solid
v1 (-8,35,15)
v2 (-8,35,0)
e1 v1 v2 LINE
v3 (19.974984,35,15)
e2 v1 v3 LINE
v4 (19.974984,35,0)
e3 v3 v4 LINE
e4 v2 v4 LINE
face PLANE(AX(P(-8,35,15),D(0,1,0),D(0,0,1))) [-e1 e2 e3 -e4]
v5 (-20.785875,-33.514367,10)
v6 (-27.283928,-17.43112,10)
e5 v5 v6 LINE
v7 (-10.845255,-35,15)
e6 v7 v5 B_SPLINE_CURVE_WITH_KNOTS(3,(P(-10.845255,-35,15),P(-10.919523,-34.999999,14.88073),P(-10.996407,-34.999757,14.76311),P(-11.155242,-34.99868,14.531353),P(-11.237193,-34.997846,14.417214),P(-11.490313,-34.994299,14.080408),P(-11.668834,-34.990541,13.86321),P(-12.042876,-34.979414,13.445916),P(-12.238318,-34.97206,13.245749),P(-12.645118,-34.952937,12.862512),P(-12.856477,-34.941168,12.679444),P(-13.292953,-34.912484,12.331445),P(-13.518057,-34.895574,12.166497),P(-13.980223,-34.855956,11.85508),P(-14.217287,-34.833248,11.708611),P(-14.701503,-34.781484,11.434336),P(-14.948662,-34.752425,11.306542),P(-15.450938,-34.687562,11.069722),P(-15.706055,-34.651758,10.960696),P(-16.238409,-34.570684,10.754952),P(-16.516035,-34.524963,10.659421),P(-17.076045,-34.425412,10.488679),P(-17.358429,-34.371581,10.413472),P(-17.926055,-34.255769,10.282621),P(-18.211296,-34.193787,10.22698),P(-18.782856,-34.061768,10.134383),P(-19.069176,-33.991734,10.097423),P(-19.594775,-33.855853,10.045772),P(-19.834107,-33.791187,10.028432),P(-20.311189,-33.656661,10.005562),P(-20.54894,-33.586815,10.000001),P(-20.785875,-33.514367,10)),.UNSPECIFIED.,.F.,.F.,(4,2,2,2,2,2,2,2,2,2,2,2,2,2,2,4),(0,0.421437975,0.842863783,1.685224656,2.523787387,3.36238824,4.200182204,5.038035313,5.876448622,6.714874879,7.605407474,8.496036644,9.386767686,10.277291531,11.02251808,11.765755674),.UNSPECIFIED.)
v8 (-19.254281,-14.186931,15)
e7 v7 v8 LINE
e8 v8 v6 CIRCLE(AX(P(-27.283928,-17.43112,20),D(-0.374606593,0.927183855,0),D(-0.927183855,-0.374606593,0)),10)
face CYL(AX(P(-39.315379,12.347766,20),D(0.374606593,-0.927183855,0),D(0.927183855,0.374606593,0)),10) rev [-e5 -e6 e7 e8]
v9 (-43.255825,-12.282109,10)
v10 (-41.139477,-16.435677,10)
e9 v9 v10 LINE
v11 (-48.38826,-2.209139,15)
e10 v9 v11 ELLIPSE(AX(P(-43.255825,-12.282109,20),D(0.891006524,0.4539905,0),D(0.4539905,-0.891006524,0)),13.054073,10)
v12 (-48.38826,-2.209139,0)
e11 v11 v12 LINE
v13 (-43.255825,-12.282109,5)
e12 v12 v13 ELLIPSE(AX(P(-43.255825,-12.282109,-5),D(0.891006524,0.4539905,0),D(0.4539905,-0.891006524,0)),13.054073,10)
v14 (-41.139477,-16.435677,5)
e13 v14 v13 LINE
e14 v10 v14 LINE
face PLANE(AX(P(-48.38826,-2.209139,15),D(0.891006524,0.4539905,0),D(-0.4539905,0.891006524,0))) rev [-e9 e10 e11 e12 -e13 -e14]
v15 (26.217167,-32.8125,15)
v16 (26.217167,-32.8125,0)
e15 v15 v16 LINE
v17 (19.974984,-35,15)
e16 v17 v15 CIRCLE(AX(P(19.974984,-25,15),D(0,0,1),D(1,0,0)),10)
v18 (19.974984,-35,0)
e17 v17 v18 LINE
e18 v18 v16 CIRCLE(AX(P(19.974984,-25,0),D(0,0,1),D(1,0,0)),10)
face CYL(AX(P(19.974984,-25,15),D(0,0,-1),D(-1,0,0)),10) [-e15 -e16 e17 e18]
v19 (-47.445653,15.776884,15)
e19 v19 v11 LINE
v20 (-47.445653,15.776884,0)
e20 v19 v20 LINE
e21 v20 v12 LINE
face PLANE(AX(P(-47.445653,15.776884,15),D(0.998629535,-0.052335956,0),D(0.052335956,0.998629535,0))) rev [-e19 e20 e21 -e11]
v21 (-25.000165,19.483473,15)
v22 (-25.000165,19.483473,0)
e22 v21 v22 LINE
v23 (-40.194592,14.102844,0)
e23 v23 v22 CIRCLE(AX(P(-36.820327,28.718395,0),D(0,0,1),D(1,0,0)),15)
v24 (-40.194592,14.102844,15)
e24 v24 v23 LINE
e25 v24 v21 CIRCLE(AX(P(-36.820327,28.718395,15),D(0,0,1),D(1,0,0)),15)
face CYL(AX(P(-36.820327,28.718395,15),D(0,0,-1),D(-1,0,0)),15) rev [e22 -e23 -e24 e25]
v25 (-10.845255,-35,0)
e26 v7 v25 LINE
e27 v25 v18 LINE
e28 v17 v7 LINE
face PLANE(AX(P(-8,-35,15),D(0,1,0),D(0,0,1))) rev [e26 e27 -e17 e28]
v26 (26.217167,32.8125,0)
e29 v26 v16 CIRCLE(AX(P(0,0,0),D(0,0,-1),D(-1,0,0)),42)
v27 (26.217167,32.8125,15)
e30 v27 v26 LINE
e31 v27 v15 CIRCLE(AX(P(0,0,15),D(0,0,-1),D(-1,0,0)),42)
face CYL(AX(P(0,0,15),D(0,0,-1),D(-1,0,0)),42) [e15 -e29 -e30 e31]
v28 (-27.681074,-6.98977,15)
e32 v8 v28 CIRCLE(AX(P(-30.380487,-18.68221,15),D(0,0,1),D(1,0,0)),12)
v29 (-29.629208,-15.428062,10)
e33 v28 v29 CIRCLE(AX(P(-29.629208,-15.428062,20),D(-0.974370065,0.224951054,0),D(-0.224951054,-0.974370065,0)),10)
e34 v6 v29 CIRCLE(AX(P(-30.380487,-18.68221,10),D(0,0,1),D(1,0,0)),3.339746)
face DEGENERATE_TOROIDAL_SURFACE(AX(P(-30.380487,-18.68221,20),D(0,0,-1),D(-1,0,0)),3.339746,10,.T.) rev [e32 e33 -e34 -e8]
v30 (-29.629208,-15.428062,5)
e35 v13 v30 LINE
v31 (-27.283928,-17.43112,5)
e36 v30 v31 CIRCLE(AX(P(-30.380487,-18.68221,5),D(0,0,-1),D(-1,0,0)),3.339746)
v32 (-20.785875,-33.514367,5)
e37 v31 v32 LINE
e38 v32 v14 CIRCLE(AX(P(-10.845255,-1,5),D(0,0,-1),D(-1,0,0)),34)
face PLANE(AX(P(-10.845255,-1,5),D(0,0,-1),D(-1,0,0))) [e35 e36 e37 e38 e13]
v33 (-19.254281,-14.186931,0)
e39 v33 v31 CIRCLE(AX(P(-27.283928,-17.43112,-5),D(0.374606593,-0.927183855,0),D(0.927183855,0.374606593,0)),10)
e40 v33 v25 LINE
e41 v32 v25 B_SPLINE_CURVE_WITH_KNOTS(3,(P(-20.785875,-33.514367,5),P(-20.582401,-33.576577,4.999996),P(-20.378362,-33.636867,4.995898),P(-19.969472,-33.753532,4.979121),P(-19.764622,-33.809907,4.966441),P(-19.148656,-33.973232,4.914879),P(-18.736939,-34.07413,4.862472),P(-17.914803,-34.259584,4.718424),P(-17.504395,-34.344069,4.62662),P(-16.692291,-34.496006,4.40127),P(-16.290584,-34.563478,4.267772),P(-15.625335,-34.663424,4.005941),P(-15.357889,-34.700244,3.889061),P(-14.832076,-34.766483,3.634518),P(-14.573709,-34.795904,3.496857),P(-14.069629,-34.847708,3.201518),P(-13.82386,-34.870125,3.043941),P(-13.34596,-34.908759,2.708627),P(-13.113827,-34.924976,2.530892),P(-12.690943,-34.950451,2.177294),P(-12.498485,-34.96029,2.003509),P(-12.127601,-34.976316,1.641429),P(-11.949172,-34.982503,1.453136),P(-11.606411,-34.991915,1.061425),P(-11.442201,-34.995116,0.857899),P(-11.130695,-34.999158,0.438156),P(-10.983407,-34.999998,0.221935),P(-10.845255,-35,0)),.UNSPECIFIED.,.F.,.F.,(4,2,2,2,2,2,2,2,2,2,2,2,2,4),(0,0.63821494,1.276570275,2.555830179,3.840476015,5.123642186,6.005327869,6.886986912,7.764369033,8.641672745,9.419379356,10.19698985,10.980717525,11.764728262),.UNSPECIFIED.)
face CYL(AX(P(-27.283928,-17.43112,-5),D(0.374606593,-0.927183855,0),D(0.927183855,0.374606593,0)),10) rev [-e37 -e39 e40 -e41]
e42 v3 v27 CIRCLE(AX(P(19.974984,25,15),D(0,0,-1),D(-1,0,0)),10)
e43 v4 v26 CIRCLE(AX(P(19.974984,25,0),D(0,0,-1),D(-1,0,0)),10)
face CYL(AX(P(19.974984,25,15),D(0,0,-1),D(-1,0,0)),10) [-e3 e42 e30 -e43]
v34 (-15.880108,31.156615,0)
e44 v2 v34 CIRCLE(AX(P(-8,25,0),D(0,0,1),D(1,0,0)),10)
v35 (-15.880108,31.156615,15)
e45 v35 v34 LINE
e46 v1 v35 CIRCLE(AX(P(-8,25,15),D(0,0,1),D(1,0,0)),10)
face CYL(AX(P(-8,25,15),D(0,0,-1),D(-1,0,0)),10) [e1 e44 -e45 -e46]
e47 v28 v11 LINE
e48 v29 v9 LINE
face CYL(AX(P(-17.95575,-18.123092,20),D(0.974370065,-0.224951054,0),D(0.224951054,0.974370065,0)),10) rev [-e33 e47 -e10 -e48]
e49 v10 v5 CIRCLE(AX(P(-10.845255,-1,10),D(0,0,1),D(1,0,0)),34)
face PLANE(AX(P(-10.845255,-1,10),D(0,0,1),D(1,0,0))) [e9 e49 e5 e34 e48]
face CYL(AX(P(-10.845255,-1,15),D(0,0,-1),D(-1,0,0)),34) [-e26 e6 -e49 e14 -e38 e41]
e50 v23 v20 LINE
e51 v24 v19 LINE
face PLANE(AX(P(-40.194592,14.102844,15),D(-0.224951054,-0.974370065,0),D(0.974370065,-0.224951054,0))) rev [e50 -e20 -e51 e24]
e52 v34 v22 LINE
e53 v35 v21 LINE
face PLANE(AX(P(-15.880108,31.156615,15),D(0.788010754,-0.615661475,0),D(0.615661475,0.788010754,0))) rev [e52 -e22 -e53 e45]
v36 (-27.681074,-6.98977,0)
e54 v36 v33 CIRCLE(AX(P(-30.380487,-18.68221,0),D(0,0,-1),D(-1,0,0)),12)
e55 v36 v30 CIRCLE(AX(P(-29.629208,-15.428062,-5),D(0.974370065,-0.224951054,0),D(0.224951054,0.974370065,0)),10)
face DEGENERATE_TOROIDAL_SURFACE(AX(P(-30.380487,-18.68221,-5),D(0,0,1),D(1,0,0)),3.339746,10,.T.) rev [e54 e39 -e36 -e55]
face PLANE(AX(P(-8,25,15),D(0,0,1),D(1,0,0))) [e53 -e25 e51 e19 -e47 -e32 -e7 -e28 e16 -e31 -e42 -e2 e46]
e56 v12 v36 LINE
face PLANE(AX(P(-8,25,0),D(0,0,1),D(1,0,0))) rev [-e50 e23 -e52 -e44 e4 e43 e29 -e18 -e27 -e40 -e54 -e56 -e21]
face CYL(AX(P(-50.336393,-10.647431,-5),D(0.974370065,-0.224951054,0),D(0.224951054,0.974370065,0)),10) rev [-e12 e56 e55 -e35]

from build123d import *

# Parameters (mm, degrees)
BOSS_EXTRUDE1_DEPTH   = 15
CORTE_EXTRUS_O1_DEPTH = 5
CORTE_EXTRUS_O2_START = -10
CORTE_EXTRUS_O2_DEPTH = 5
FILETE1_R             = 10


with BuildPart() as part:
    # Sketch2 → Boss-Extrude1 (new body)
    with BuildSketch(Plane.XY):
        with BuildLine():
            Line((-40.19459236, 14.102844367), (-47.445652556, 15.776883518))
            Line((-47.445652556, 15.776883518), (-48.388260059, -2.209139093))
            Line((-48.388260059, -2.209139093), (-41.139476942, -16.435676991))
            ThreePointArc((-41.139476942, -16.435676991), (-28.61020632, -29.989765588), (-10.845255119, -35))
            Line((-10.845255119, -35), (-8, -35))
            Line((-8, -35), (19.974984355, -35))
            ThreePointArc((19.974984355, -35), (23.282173494, -34.437293044), (26.217166967, -32.8125))
            ThreePointArc((26.217166967, -32.8125), (42, 0), (26.217166967, 32.8125))
            ThreePointArc((26.217166967, 32.8125), (23.282173494, 34.437293044), (19.974984355, 35))
            Line((19.974984355, 35), (-8, 35))
            ThreePointArc((-8, 35), (-12.383711468, 33.987940463), (-15.880107536, 31.156614753))
            Line((-15.880107536, 31.156614753), (-25.000165241, 19.483473209))
            ThreePointArc((-25.000165241, 19.483473209), (-31.813223657, 14.578772972), (-40.19459236, 14.102844367))
        make_face()
    extrude(amount=BOSS_EXTRUDE1_DEPTH)

    # Esboço4 → Corte-extrusão1 (cut)
    with BuildSketch(Plane(origin=(0, 0, 0), x_dir=(-1, 0, 0), z_dir=(0, 0, -1))):
        with BuildLine():
            Line((48.388260059, -2.209139093), (27.681074333, -6.989769605))
            ThreePointArc((27.681074333, -6.989769605), (22.587110405, -9.557338795), (19.25428073, -14.186931261))
            Line((19.25428073, -14.186931261), (10.845255119, -35))
            ThreePointArc((10.845255119, -35), (28.61020632, -29.989765588), (41.139476942, -16.435676991))
            Line((41.139476942, -16.435676991), (48.388260059, -2.209139093))
        make_face()
    extrude(amount=-CORTE_EXTRUS_O1_DEPTH, mode=Mode.SUBTRACT)

    # Esboço4<2> → Corte-extrusão2 (cut)
    with BuildSketch(Plane(origin=(0, 0, 0), x_dir=(-1, 0, 0), z_dir=(0, 0, -1)).offset(CORTE_EXTRUS_O2_START)):
        with BuildLine():
            Line((48.388260059, -2.209139093), (27.681074333, -6.989769605))
            ThreePointArc((27.681074333, -6.989769605), (22.587110405, -9.557338795), (19.25428073, -14.186931261))
            Line((19.25428073, -14.186931261), (10.845255119, -35))
            ThreePointArc((10.845255119, -35), (28.61020632, -29.989765588), (41.139476942, -16.435676991))
            Line((41.139476942, -16.435676991), (48.388260059, -2.209139093))
        make_face()
    extrude(amount=-CORTE_EXTRUS_O2_DEPTH, mode=Mode.SUBTRACT)

    # Filete1
    # the kernel refuses this fillet: 10 mm, written as the material it adds along each edge
    with BuildSketch(Plane(origin=(-19.25428073, -14.186931261, 10), x_dir=(0, 0, 1), z_dir=(0.3746065934159196, -0.9271838545667843, 0))) as filete1_piece_1_section:
        with BuildLine():
            CenterArc((10, 8.660254038), FILETE1_R, 180, 60)
            Line((0, 8.660254038), (0, 0))
            Line((0, 0), (5, 0))
        make_face()
    filete1_piece_1 = extrude(amount=44.098252831, mode=Mode.PRIVATE)
    filete1_piece_1 = filete1_piece_1 & Plane(origin=(-10.845255119, -1, 11.322425454), x_dir=(-0.891006524188372, -0.4539904997395388, 0), z_dir=(0, 0, -1)) * Cylinder(34, 123, mode=Mode.PRIVATE)
    add(filete1_piece_1)
    with BuildSketch(Plane(origin=(-69.483990779, 2.661194099, 10), x_dir=(0, 0, 1), z_dir=(0.9743700647852346, -0.2249510543438682, 0))) as filete1_piece_2_section:
        with BuildLine():
            CenterArc((10, 8.660254038), FILETE1_R, 180, 60)
            Line((0, 8.660254038), (0, 0))
            Line((0, 0), (5, 0))
        make_face()
    filete1_piece_2 = extrude(amount=42.902504867, mode=Mode.PRIVATE)
    filete1_piece_2 = split(filete1_piece_2, bisect_by=Plane(origin=(-44.017931787, -10.786391272, 11.322425454), z_dir=(0.8910065241883723, 0.4539904997395381, 0)), keep=Keep.TOP, mode=Mode.PRIVATE)
    add(filete1_piece_2)
    with BuildSketch(Plane(origin=(-69.483990779, 2.661194099, 5), x_dir=(0, 0, -1), z_dir=(0.9743700647852346, -0.2249510543438682, 0))) as filete1_piece_3_section:
        with BuildLine():
            CenterArc((10, -8.660254038), FILETE1_R, 120, 60)
            Line((0, -8.660254038), (0, 0))
            Line((0, 0), (5, 0))
        make_face()
    filete1_piece_3 = extrude(amount=42.902504867, mode=Mode.PRIVATE)
    filete1_piece_3 = split(filete1_piece_3, bisect_by=Plane(origin=(-44.017931791, -10.786391265, 3.677574546), z_dir=(0.8910065241883723, 0.4539904997395381, 0)), keep=Keep.TOP, mode=Mode.PRIVATE)
    add(filete1_piece_3)
    with BuildSketch(Plane(origin=(-19.25428073, -14.186931261, 5), x_dir=(0, 0, -1), z_dir=(0.3746065934159196, -0.9271838545667843, 0))) as filete1_piece_4_section:
        with BuildLine():
            CenterArc((10, -8.660254038), FILETE1_R, 120, 60)
            Line((0, -8.660254038), (0, 0))
            Line((0, 0), (5, 0))
        make_face()
    filete1_piece_4 = extrude(amount=44.098252831, mode=Mode.PRIVATE)
    filete1_piece_4 = filete1_piece_4 & Plane(origin=(-10.845255119, -1, 3.677574546), x_dir=(-0.891006524188372, -0.4539904997395388, 0), z_dir=(0, 0, -1)) * Cylinder(34, 123, mode=Mode.PRIVATE)
    add(filete1_piece_4)
    with BuildSketch(Plane(origin=(-30.380486985, -18.682210382, 10), x_dir=(0.22495105434386828, 0.9743700647852345, 0), z_dir=(-0.9743700647852345, 0.22495105434386828, 0))) as filete1_piece_5:
        with BuildLine():
            CenterArc((3.339745962, -10), FILETE1_R, 30, 60)
            Line((3.339745962, 0), (12, 0))
            Line((12, 0), (12, -5))
        make_face()
    revolve(axis=Axis((-30.380486985, -18.682210382, 10), (0, 0, -1)), revolution_arc=55)
    with BuildSketch(Plane(origin=(-30.380486985, -18.682210382, 5), x_dir=(0.22495105434386828, 0.9743700647852345, 0), z_dir=(-0.9743700647852345, 0.22495105434386828, 0))) as filete1_piece_6:
        with BuildLine():
            CenterArc((3.339745962, 10), FILETE1_R, 270, 60)
            Line((3.339745962, 0), (12, 0))
            Line((12, 0), (12, 5))
        make_face()
    revolve(axis=Axis((-30.380486985, -18.682210382, 5), (0, 0, -1)), revolution_arc=55)


solid = part.part
